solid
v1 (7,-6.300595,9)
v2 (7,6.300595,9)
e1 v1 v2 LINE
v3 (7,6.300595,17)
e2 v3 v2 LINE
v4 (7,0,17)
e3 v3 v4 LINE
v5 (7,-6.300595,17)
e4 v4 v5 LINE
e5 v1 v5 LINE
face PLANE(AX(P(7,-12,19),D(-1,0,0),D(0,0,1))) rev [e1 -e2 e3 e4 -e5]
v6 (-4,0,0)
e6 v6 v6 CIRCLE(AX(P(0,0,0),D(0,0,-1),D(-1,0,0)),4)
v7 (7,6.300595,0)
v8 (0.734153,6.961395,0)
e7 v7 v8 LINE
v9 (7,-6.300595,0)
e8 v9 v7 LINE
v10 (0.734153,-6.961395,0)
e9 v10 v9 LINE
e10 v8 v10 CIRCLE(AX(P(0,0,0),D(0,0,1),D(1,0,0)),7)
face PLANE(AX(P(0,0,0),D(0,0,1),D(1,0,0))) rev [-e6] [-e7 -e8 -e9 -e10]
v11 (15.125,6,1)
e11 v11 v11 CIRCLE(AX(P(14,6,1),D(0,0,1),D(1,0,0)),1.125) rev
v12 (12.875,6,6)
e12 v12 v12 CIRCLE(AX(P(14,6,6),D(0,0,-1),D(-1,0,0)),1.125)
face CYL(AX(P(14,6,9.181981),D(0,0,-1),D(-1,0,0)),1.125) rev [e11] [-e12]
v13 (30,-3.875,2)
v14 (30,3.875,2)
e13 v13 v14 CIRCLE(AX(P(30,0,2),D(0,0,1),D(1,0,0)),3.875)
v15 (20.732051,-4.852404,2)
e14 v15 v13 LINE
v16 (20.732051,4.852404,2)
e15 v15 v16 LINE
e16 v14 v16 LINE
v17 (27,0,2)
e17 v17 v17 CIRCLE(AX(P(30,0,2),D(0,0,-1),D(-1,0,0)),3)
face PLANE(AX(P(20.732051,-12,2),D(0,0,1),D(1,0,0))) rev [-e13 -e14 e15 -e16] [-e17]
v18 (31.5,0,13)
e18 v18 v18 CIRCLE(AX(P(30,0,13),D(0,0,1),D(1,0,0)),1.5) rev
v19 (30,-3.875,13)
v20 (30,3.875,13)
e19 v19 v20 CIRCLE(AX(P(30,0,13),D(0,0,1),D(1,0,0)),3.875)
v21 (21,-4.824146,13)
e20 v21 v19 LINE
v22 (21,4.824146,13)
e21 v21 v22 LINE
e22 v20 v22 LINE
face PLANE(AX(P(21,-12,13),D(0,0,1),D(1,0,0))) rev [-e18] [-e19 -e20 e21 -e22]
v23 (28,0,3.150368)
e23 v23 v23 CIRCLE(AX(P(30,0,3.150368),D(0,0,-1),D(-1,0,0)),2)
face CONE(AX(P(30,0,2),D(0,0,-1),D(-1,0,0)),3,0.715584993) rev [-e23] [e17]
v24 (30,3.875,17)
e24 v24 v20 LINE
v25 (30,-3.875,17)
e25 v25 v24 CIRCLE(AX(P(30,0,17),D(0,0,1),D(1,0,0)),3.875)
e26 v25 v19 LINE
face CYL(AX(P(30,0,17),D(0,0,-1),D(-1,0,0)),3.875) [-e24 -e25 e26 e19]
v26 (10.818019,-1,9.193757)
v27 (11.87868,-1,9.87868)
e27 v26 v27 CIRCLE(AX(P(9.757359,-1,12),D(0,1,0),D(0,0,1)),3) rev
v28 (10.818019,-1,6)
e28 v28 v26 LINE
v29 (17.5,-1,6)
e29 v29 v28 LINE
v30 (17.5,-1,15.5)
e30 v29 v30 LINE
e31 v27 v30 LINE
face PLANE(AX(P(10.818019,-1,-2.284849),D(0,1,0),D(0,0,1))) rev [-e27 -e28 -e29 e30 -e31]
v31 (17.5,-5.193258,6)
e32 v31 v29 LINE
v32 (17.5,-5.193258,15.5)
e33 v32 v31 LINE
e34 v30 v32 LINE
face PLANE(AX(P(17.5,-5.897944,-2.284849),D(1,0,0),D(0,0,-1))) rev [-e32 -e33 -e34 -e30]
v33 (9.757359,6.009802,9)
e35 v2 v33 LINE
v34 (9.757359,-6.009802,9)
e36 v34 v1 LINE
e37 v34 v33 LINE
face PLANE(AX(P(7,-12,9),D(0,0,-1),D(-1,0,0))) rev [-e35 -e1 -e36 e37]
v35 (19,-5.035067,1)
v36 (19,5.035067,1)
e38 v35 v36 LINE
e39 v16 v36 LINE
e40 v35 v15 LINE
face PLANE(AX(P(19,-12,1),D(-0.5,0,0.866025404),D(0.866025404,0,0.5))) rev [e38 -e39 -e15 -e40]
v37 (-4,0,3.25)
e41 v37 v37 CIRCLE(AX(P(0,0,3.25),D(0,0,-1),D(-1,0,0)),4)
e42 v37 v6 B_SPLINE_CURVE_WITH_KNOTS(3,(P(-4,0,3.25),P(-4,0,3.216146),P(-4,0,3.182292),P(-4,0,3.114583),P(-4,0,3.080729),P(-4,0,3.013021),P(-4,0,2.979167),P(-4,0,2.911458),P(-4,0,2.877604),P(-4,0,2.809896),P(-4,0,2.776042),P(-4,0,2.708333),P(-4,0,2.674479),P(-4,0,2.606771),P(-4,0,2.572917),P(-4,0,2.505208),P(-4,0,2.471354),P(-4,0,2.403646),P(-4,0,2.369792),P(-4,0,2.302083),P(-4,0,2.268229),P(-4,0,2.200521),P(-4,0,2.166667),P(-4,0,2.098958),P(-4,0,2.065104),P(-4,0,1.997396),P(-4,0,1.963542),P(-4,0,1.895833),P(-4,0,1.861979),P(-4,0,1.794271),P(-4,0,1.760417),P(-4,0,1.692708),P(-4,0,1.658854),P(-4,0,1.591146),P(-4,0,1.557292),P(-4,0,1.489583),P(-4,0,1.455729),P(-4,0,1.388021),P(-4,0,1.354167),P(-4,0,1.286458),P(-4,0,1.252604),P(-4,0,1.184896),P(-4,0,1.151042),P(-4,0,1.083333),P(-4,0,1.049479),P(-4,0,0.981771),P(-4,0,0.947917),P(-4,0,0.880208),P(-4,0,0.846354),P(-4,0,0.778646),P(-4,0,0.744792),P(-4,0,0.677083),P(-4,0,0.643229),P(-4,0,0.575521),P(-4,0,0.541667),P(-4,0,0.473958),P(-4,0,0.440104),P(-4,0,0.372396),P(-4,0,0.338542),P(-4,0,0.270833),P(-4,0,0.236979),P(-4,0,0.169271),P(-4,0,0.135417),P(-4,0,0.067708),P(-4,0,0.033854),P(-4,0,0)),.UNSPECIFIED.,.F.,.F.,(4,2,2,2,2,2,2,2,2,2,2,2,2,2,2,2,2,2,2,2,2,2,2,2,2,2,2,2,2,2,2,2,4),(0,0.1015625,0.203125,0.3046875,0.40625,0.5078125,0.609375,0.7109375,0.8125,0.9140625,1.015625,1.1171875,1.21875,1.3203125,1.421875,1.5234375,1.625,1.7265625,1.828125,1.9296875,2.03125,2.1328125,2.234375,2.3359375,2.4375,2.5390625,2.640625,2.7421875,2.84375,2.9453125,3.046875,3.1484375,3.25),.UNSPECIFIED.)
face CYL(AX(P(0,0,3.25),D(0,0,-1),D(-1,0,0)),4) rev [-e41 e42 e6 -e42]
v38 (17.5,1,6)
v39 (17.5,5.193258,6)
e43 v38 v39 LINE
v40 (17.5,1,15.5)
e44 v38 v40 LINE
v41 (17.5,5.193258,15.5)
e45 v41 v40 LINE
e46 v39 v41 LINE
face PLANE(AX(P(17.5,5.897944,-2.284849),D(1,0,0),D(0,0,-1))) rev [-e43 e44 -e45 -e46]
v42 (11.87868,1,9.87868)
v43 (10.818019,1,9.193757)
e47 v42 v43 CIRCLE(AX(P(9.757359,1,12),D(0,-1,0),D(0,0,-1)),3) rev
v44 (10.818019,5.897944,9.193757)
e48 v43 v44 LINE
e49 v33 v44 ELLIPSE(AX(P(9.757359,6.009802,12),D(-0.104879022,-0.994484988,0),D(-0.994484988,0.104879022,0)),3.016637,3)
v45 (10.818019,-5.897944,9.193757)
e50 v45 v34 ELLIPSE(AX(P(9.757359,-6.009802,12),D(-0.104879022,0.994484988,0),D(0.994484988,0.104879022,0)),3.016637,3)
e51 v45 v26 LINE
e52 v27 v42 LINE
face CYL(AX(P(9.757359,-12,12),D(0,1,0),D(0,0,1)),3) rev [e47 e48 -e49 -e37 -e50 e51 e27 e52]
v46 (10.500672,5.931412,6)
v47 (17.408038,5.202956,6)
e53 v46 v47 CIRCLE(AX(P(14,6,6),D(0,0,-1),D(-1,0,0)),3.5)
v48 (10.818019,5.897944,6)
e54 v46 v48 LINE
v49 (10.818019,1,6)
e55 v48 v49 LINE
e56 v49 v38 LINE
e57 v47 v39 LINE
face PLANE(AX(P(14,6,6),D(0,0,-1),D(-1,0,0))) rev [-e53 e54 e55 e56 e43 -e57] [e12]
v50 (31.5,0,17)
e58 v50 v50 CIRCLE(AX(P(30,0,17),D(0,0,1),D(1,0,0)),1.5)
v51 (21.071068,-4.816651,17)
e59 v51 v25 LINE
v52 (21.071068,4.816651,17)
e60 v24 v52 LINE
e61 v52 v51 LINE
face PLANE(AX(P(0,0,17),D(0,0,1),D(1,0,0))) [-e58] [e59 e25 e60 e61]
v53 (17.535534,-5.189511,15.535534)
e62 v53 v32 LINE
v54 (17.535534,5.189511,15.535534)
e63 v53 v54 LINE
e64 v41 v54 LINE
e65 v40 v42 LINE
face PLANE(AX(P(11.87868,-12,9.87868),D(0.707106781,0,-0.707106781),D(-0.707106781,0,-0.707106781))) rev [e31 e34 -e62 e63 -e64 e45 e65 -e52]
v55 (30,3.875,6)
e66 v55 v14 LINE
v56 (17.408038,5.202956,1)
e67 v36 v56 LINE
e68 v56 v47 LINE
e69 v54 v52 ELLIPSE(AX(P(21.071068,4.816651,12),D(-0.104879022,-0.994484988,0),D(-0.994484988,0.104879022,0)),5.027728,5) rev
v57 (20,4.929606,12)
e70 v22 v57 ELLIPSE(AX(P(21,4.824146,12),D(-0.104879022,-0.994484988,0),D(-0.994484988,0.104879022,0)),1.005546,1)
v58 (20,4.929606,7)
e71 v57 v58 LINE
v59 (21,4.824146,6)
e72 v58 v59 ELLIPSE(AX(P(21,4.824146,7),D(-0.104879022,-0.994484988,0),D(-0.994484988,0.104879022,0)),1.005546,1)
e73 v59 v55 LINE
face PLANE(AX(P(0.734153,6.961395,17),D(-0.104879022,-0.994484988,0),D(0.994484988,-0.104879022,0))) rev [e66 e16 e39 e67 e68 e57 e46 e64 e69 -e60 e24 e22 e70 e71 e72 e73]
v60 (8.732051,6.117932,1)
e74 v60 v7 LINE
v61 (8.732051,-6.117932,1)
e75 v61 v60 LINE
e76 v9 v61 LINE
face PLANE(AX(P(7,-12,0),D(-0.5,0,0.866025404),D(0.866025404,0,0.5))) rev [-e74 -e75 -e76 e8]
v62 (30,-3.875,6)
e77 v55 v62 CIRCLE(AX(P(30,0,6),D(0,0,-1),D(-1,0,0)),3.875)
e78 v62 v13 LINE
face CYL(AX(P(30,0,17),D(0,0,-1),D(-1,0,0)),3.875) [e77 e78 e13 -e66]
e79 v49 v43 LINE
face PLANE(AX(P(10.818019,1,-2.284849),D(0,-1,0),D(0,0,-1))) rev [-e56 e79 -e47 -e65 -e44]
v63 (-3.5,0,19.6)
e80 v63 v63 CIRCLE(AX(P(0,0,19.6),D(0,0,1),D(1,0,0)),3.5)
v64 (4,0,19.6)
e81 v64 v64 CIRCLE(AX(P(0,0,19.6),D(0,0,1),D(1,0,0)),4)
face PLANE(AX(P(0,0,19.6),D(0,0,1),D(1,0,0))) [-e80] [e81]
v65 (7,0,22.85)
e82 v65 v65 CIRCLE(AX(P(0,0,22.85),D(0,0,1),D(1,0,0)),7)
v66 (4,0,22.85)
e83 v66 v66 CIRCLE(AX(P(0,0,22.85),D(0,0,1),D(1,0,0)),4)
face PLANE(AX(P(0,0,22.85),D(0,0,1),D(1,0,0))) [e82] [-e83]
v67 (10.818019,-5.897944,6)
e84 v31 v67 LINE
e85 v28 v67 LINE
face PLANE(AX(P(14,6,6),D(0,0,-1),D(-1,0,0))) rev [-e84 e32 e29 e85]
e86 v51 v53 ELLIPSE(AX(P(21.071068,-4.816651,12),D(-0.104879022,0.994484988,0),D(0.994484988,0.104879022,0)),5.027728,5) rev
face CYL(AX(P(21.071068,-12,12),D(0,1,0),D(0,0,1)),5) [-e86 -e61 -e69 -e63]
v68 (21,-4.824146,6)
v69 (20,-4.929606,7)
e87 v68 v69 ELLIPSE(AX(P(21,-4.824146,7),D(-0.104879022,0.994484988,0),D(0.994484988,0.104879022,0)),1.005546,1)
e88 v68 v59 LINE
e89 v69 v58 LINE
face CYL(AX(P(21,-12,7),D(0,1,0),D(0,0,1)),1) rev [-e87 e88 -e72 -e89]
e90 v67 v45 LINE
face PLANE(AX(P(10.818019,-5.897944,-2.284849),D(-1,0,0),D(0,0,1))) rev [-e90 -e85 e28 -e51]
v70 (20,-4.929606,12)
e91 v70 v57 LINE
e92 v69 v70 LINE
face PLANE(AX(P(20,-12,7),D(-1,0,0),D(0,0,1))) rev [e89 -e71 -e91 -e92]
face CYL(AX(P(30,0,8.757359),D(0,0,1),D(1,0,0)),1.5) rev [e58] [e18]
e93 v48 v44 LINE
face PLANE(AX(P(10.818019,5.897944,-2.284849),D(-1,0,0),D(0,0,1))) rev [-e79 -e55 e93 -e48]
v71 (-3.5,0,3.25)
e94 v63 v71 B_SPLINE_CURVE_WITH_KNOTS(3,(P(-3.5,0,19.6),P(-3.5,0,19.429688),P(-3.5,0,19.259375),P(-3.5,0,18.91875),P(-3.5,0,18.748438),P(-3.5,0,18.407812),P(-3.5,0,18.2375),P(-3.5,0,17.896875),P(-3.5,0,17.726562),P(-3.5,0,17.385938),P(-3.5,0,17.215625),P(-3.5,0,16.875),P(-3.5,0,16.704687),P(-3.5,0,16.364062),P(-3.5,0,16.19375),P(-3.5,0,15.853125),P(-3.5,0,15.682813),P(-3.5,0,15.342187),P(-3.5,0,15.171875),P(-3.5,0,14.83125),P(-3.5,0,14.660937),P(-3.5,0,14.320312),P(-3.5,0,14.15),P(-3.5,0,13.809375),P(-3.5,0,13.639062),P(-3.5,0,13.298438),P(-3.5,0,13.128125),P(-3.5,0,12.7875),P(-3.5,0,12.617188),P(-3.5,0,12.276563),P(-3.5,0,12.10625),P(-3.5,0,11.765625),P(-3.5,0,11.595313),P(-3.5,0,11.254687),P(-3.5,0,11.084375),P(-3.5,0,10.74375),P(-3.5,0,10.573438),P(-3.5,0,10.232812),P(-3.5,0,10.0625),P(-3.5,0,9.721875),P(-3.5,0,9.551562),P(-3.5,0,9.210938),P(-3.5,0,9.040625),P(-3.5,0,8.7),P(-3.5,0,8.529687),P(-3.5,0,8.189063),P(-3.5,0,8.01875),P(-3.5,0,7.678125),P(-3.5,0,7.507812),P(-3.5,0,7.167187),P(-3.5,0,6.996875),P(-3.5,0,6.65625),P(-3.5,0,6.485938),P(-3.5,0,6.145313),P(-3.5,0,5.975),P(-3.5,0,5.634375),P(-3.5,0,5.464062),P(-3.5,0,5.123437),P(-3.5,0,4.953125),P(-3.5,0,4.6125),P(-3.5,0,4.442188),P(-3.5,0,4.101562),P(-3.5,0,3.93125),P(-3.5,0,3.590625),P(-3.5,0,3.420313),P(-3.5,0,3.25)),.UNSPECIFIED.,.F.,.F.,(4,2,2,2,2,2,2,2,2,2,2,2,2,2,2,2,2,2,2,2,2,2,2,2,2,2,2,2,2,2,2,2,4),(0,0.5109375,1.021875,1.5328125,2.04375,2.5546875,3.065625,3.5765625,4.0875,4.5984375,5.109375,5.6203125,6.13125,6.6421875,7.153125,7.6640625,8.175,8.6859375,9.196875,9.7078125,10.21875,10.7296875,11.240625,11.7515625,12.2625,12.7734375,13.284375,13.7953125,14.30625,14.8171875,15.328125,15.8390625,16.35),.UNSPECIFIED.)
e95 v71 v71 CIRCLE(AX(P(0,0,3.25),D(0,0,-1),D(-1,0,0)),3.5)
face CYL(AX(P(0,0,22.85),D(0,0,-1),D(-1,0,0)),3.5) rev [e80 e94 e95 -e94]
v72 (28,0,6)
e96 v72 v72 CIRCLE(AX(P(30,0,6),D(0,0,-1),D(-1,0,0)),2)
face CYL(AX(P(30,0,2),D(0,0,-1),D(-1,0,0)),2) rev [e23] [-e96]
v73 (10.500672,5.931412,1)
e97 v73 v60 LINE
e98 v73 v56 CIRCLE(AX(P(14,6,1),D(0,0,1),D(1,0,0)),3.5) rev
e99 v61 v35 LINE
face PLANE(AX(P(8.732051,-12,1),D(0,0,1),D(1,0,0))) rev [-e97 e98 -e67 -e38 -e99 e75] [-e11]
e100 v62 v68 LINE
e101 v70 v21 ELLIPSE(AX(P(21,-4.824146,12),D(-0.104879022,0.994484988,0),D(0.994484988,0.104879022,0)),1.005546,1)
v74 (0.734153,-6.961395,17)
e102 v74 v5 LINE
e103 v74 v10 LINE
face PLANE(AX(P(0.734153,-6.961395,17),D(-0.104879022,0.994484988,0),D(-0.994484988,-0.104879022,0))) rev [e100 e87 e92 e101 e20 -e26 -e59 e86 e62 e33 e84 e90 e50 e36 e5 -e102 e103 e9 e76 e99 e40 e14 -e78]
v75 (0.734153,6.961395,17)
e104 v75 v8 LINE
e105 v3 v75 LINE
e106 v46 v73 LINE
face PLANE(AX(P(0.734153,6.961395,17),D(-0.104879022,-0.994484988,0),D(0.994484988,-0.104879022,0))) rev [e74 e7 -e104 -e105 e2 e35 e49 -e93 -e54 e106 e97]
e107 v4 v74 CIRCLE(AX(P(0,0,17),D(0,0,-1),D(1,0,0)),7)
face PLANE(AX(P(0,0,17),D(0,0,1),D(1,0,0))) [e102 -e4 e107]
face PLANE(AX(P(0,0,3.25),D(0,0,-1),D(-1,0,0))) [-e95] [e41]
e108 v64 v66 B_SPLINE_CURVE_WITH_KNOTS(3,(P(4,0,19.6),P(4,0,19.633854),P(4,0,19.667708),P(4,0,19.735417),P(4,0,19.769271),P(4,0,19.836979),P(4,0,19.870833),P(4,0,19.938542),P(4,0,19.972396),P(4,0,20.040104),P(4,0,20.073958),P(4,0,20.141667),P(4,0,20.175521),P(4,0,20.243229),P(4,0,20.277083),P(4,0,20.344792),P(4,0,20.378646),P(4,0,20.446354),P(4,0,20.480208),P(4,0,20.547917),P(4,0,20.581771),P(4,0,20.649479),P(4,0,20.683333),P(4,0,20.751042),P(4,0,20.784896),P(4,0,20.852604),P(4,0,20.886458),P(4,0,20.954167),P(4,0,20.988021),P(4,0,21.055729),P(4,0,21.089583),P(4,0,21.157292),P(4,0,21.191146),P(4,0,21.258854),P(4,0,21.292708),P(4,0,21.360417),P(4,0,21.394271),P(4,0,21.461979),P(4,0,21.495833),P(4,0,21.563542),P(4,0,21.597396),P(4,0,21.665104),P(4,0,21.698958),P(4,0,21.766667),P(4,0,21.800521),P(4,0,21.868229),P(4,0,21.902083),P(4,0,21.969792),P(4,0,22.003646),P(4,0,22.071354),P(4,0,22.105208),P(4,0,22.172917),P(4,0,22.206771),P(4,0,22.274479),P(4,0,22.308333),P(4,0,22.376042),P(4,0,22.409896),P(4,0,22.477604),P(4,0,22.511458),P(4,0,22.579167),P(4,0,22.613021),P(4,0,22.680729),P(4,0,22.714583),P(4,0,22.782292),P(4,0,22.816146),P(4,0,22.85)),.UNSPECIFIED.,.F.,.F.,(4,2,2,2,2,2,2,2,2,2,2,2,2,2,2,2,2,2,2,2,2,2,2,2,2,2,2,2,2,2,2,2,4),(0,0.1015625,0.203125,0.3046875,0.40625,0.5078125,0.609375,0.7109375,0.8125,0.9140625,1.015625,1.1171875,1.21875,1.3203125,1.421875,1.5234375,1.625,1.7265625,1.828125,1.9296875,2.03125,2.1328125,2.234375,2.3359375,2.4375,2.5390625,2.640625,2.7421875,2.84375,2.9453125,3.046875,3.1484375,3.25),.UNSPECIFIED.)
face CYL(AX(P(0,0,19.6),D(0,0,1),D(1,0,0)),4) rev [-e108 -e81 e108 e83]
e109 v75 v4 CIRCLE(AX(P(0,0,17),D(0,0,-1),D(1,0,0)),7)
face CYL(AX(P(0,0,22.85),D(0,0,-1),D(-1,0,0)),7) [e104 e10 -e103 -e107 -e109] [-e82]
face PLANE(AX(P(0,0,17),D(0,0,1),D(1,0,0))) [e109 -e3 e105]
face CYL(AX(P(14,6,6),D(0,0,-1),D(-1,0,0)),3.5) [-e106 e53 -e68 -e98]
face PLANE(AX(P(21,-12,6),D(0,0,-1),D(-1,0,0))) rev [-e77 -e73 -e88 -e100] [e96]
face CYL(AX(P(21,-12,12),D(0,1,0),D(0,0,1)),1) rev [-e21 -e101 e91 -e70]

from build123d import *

# Parameters (mm, degrees)
SKETCH1_R                = 7
SKETCH1_R_2              = 3.5
CYLINDER_DEPTH           = 22.85
SKETCH2_R                = 4
BORE_1_DEPTH             = 3.25
BORE_START               = -3.25
SKETCH3_R                = 4
BORE_2_DEPTH             = 3.25
ARM_DEPTH                = 17
SKETCH5_R                = 3.5
OUTER_HOLE_SURFACE_DEPTH = 6
SKETCH6_R                = 1.125
OUTER_HOLE_DEPTH         = 6
SIDE_FEATURES_DEPTH      = 22
RIB_START                = -11
SKETCH10_W               = 6.681980515
SKETCH10_H               = 4.897943925
RIB_DEPTH                = 9.5
SKETCH13_R               = 1.5
BOTTOM_HOLE_DEPTH        = 4


# Read off the part's stored shape, not the designer's step: Top Counter-sunk
with BuildPart() as part:
    # Sketch1 → Cylinder (new body)
    with BuildSketch(Plane.XY):
        with Locations(Location((0, 0, 0), (0, 0, 180))):
            Circle(SKETCH1_R)
        with Locations(Location((0, 0, 0), (0, 0, 180))):
            Circle(SKETCH1_R_2, mode=Mode.SUBTRACT)
    extrude(amount=CYLINDER_DEPTH)

    # Sketch2 → Bore 1 (cut)
    with BuildSketch(Plane.XY.offset(22.85)):
        Circle(SKETCH2_R)
    extrude(amount=-BORE_1_DEPTH, mode=Mode.SUBTRACT)

    # Sketch3 → Bore 2 (cut)
    with BuildSketch(Plane(origin=(0, 0, 0), x_dir=(-1, 0, 0), z_dir=(0, 0, -1)).offset(BORE_START)):
        with Locations(Location((0, 0, 0), (0, 0, 180))):
            Circle(SKETCH3_R)
    extrude(amount=BORE_2_DEPTH, mode=Mode.SUBTRACT)

    # Sketch4 → Arm (add)
    with BuildSketch(Plane.XY):
        with BuildLine():
            Line((0.734153157, 6.961394914), (30, 3.875))
            ThreePointArc((30, 3.875), (33.875, 0), (30, -3.875))
            Line((30, -3.875), (0.734153157, -6.961394914))
            ThreePointArc((0.734153157, -6.961394914), (7, 0), (0.734153157, 6.961394914))
        make_face()
    extrude(amount=ARM_DEPTH)

    # Sketch5 → Outer Hole surface (add)
    with BuildSketch(Plane(origin=(0, 0, 0), x_dir=(-1, 0, 0), z_dir=(0, 0, -1))):
        with Locations((-14, 6)):
            Circle(SKETCH5_R)
    extrude(amount=-OUTER_HOLE_SURFACE_DEPTH)

    # Sketch6 → Outer hole (cut)
    with BuildSketch(Plane(origin=(0, 0, 0), x_dir=(-1, 0, 0), z_dir=(0, 0, -1))):
        with Locations((-14, 6)):
            Circle(SKETCH6_R)
    extrude(amount=-OUTER_HOLE_DEPTH, mode=Mode.SUBTRACT)

    # Sketch8 → side Features (cut)
    with BuildSketch(Plane(origin=(0, 10, 0), x_dir=(1, 0, 0), z_dir=(0, 1, 0))):
        with BuildLine():
            Line((21, -6), (40, -6))
            Line((40, -6), (40, -13))
            Line((40, -13), (21, -13))
            ThreePointArc((21, -13), (20.292893219, -12.707106781), (20, -12))
            Line((20, -12), (20, -7))
            ThreePointArc((20, -7), (20.292893219, -6.292893219), (21, -6))
        make_face()
        with BuildLine():
            Line((7, -19), (7, -9))
            Line((7, -9), (9.757359313, -9))
            ThreePointArc((9.757359313, -9), (10.90540961, -9.228361402), (11.878679656, -9.878679656))
            Line((11.878679656, -9.878679656), (17.535533906, -15.535533906))
            ThreePointArc((17.535533906, -15.535533906), (19.15765065, -16.619397663), (21.071067812, -17))
            Line((21.071067812, -17), (27, -17))
            Line((27, -17), (27, -19))
            Line((27, -19), (7, -19))
        make_face()
        Polygon((7, 0), (8.732050808, -1), (19, -1), (20.732050808, -2), (40, -2), (40, 0), align=None)
    extrude(amount=-SIDE_FEATURES_DEPTH, mode=Mode.SUBTRACT)

    # Sketch10 → Rib (cut)
    with BuildSketch(Plane.XY.offset(17).offset(RIB_START)):
        with Locations((14.159009743, 3.448971963)):
            Rectangle(SKETCH10_W, SKETCH10_H)
        with Locations((14.159009743, -3.448971963)):
            Rectangle(SKETCH10_W, SKETCH10_H)
    extrude(amount=RIB_DEPTH, mode=Mode.SUBTRACT)

    # Top Counter-sunk outline → Top Counter-sunk (revolve, cut)
    with BuildSketch(Plane(origin=(30, 0, 0), x_dir=(1, 0, 0), z_dir=(0, -1, 0))):
        Polygon((2, 3.150368407), (2, 6), (0, 6), (0, 2), (3, 2), align=None)
    revolve(axis=Axis((30, 0, 0), (0, 0, 1)), mode=Mode.SUBTRACT)

    # Sketch13 → Bottom hole (cut)
    with BuildSketch(Plane.XY.offset(17)):
        with Locations((30, 0)):
            Circle(SKETCH13_R)
    extrude(amount=-BOTTOM_HOLE_DEPTH, mode=Mode.SUBTRACT)


solid = part.part
